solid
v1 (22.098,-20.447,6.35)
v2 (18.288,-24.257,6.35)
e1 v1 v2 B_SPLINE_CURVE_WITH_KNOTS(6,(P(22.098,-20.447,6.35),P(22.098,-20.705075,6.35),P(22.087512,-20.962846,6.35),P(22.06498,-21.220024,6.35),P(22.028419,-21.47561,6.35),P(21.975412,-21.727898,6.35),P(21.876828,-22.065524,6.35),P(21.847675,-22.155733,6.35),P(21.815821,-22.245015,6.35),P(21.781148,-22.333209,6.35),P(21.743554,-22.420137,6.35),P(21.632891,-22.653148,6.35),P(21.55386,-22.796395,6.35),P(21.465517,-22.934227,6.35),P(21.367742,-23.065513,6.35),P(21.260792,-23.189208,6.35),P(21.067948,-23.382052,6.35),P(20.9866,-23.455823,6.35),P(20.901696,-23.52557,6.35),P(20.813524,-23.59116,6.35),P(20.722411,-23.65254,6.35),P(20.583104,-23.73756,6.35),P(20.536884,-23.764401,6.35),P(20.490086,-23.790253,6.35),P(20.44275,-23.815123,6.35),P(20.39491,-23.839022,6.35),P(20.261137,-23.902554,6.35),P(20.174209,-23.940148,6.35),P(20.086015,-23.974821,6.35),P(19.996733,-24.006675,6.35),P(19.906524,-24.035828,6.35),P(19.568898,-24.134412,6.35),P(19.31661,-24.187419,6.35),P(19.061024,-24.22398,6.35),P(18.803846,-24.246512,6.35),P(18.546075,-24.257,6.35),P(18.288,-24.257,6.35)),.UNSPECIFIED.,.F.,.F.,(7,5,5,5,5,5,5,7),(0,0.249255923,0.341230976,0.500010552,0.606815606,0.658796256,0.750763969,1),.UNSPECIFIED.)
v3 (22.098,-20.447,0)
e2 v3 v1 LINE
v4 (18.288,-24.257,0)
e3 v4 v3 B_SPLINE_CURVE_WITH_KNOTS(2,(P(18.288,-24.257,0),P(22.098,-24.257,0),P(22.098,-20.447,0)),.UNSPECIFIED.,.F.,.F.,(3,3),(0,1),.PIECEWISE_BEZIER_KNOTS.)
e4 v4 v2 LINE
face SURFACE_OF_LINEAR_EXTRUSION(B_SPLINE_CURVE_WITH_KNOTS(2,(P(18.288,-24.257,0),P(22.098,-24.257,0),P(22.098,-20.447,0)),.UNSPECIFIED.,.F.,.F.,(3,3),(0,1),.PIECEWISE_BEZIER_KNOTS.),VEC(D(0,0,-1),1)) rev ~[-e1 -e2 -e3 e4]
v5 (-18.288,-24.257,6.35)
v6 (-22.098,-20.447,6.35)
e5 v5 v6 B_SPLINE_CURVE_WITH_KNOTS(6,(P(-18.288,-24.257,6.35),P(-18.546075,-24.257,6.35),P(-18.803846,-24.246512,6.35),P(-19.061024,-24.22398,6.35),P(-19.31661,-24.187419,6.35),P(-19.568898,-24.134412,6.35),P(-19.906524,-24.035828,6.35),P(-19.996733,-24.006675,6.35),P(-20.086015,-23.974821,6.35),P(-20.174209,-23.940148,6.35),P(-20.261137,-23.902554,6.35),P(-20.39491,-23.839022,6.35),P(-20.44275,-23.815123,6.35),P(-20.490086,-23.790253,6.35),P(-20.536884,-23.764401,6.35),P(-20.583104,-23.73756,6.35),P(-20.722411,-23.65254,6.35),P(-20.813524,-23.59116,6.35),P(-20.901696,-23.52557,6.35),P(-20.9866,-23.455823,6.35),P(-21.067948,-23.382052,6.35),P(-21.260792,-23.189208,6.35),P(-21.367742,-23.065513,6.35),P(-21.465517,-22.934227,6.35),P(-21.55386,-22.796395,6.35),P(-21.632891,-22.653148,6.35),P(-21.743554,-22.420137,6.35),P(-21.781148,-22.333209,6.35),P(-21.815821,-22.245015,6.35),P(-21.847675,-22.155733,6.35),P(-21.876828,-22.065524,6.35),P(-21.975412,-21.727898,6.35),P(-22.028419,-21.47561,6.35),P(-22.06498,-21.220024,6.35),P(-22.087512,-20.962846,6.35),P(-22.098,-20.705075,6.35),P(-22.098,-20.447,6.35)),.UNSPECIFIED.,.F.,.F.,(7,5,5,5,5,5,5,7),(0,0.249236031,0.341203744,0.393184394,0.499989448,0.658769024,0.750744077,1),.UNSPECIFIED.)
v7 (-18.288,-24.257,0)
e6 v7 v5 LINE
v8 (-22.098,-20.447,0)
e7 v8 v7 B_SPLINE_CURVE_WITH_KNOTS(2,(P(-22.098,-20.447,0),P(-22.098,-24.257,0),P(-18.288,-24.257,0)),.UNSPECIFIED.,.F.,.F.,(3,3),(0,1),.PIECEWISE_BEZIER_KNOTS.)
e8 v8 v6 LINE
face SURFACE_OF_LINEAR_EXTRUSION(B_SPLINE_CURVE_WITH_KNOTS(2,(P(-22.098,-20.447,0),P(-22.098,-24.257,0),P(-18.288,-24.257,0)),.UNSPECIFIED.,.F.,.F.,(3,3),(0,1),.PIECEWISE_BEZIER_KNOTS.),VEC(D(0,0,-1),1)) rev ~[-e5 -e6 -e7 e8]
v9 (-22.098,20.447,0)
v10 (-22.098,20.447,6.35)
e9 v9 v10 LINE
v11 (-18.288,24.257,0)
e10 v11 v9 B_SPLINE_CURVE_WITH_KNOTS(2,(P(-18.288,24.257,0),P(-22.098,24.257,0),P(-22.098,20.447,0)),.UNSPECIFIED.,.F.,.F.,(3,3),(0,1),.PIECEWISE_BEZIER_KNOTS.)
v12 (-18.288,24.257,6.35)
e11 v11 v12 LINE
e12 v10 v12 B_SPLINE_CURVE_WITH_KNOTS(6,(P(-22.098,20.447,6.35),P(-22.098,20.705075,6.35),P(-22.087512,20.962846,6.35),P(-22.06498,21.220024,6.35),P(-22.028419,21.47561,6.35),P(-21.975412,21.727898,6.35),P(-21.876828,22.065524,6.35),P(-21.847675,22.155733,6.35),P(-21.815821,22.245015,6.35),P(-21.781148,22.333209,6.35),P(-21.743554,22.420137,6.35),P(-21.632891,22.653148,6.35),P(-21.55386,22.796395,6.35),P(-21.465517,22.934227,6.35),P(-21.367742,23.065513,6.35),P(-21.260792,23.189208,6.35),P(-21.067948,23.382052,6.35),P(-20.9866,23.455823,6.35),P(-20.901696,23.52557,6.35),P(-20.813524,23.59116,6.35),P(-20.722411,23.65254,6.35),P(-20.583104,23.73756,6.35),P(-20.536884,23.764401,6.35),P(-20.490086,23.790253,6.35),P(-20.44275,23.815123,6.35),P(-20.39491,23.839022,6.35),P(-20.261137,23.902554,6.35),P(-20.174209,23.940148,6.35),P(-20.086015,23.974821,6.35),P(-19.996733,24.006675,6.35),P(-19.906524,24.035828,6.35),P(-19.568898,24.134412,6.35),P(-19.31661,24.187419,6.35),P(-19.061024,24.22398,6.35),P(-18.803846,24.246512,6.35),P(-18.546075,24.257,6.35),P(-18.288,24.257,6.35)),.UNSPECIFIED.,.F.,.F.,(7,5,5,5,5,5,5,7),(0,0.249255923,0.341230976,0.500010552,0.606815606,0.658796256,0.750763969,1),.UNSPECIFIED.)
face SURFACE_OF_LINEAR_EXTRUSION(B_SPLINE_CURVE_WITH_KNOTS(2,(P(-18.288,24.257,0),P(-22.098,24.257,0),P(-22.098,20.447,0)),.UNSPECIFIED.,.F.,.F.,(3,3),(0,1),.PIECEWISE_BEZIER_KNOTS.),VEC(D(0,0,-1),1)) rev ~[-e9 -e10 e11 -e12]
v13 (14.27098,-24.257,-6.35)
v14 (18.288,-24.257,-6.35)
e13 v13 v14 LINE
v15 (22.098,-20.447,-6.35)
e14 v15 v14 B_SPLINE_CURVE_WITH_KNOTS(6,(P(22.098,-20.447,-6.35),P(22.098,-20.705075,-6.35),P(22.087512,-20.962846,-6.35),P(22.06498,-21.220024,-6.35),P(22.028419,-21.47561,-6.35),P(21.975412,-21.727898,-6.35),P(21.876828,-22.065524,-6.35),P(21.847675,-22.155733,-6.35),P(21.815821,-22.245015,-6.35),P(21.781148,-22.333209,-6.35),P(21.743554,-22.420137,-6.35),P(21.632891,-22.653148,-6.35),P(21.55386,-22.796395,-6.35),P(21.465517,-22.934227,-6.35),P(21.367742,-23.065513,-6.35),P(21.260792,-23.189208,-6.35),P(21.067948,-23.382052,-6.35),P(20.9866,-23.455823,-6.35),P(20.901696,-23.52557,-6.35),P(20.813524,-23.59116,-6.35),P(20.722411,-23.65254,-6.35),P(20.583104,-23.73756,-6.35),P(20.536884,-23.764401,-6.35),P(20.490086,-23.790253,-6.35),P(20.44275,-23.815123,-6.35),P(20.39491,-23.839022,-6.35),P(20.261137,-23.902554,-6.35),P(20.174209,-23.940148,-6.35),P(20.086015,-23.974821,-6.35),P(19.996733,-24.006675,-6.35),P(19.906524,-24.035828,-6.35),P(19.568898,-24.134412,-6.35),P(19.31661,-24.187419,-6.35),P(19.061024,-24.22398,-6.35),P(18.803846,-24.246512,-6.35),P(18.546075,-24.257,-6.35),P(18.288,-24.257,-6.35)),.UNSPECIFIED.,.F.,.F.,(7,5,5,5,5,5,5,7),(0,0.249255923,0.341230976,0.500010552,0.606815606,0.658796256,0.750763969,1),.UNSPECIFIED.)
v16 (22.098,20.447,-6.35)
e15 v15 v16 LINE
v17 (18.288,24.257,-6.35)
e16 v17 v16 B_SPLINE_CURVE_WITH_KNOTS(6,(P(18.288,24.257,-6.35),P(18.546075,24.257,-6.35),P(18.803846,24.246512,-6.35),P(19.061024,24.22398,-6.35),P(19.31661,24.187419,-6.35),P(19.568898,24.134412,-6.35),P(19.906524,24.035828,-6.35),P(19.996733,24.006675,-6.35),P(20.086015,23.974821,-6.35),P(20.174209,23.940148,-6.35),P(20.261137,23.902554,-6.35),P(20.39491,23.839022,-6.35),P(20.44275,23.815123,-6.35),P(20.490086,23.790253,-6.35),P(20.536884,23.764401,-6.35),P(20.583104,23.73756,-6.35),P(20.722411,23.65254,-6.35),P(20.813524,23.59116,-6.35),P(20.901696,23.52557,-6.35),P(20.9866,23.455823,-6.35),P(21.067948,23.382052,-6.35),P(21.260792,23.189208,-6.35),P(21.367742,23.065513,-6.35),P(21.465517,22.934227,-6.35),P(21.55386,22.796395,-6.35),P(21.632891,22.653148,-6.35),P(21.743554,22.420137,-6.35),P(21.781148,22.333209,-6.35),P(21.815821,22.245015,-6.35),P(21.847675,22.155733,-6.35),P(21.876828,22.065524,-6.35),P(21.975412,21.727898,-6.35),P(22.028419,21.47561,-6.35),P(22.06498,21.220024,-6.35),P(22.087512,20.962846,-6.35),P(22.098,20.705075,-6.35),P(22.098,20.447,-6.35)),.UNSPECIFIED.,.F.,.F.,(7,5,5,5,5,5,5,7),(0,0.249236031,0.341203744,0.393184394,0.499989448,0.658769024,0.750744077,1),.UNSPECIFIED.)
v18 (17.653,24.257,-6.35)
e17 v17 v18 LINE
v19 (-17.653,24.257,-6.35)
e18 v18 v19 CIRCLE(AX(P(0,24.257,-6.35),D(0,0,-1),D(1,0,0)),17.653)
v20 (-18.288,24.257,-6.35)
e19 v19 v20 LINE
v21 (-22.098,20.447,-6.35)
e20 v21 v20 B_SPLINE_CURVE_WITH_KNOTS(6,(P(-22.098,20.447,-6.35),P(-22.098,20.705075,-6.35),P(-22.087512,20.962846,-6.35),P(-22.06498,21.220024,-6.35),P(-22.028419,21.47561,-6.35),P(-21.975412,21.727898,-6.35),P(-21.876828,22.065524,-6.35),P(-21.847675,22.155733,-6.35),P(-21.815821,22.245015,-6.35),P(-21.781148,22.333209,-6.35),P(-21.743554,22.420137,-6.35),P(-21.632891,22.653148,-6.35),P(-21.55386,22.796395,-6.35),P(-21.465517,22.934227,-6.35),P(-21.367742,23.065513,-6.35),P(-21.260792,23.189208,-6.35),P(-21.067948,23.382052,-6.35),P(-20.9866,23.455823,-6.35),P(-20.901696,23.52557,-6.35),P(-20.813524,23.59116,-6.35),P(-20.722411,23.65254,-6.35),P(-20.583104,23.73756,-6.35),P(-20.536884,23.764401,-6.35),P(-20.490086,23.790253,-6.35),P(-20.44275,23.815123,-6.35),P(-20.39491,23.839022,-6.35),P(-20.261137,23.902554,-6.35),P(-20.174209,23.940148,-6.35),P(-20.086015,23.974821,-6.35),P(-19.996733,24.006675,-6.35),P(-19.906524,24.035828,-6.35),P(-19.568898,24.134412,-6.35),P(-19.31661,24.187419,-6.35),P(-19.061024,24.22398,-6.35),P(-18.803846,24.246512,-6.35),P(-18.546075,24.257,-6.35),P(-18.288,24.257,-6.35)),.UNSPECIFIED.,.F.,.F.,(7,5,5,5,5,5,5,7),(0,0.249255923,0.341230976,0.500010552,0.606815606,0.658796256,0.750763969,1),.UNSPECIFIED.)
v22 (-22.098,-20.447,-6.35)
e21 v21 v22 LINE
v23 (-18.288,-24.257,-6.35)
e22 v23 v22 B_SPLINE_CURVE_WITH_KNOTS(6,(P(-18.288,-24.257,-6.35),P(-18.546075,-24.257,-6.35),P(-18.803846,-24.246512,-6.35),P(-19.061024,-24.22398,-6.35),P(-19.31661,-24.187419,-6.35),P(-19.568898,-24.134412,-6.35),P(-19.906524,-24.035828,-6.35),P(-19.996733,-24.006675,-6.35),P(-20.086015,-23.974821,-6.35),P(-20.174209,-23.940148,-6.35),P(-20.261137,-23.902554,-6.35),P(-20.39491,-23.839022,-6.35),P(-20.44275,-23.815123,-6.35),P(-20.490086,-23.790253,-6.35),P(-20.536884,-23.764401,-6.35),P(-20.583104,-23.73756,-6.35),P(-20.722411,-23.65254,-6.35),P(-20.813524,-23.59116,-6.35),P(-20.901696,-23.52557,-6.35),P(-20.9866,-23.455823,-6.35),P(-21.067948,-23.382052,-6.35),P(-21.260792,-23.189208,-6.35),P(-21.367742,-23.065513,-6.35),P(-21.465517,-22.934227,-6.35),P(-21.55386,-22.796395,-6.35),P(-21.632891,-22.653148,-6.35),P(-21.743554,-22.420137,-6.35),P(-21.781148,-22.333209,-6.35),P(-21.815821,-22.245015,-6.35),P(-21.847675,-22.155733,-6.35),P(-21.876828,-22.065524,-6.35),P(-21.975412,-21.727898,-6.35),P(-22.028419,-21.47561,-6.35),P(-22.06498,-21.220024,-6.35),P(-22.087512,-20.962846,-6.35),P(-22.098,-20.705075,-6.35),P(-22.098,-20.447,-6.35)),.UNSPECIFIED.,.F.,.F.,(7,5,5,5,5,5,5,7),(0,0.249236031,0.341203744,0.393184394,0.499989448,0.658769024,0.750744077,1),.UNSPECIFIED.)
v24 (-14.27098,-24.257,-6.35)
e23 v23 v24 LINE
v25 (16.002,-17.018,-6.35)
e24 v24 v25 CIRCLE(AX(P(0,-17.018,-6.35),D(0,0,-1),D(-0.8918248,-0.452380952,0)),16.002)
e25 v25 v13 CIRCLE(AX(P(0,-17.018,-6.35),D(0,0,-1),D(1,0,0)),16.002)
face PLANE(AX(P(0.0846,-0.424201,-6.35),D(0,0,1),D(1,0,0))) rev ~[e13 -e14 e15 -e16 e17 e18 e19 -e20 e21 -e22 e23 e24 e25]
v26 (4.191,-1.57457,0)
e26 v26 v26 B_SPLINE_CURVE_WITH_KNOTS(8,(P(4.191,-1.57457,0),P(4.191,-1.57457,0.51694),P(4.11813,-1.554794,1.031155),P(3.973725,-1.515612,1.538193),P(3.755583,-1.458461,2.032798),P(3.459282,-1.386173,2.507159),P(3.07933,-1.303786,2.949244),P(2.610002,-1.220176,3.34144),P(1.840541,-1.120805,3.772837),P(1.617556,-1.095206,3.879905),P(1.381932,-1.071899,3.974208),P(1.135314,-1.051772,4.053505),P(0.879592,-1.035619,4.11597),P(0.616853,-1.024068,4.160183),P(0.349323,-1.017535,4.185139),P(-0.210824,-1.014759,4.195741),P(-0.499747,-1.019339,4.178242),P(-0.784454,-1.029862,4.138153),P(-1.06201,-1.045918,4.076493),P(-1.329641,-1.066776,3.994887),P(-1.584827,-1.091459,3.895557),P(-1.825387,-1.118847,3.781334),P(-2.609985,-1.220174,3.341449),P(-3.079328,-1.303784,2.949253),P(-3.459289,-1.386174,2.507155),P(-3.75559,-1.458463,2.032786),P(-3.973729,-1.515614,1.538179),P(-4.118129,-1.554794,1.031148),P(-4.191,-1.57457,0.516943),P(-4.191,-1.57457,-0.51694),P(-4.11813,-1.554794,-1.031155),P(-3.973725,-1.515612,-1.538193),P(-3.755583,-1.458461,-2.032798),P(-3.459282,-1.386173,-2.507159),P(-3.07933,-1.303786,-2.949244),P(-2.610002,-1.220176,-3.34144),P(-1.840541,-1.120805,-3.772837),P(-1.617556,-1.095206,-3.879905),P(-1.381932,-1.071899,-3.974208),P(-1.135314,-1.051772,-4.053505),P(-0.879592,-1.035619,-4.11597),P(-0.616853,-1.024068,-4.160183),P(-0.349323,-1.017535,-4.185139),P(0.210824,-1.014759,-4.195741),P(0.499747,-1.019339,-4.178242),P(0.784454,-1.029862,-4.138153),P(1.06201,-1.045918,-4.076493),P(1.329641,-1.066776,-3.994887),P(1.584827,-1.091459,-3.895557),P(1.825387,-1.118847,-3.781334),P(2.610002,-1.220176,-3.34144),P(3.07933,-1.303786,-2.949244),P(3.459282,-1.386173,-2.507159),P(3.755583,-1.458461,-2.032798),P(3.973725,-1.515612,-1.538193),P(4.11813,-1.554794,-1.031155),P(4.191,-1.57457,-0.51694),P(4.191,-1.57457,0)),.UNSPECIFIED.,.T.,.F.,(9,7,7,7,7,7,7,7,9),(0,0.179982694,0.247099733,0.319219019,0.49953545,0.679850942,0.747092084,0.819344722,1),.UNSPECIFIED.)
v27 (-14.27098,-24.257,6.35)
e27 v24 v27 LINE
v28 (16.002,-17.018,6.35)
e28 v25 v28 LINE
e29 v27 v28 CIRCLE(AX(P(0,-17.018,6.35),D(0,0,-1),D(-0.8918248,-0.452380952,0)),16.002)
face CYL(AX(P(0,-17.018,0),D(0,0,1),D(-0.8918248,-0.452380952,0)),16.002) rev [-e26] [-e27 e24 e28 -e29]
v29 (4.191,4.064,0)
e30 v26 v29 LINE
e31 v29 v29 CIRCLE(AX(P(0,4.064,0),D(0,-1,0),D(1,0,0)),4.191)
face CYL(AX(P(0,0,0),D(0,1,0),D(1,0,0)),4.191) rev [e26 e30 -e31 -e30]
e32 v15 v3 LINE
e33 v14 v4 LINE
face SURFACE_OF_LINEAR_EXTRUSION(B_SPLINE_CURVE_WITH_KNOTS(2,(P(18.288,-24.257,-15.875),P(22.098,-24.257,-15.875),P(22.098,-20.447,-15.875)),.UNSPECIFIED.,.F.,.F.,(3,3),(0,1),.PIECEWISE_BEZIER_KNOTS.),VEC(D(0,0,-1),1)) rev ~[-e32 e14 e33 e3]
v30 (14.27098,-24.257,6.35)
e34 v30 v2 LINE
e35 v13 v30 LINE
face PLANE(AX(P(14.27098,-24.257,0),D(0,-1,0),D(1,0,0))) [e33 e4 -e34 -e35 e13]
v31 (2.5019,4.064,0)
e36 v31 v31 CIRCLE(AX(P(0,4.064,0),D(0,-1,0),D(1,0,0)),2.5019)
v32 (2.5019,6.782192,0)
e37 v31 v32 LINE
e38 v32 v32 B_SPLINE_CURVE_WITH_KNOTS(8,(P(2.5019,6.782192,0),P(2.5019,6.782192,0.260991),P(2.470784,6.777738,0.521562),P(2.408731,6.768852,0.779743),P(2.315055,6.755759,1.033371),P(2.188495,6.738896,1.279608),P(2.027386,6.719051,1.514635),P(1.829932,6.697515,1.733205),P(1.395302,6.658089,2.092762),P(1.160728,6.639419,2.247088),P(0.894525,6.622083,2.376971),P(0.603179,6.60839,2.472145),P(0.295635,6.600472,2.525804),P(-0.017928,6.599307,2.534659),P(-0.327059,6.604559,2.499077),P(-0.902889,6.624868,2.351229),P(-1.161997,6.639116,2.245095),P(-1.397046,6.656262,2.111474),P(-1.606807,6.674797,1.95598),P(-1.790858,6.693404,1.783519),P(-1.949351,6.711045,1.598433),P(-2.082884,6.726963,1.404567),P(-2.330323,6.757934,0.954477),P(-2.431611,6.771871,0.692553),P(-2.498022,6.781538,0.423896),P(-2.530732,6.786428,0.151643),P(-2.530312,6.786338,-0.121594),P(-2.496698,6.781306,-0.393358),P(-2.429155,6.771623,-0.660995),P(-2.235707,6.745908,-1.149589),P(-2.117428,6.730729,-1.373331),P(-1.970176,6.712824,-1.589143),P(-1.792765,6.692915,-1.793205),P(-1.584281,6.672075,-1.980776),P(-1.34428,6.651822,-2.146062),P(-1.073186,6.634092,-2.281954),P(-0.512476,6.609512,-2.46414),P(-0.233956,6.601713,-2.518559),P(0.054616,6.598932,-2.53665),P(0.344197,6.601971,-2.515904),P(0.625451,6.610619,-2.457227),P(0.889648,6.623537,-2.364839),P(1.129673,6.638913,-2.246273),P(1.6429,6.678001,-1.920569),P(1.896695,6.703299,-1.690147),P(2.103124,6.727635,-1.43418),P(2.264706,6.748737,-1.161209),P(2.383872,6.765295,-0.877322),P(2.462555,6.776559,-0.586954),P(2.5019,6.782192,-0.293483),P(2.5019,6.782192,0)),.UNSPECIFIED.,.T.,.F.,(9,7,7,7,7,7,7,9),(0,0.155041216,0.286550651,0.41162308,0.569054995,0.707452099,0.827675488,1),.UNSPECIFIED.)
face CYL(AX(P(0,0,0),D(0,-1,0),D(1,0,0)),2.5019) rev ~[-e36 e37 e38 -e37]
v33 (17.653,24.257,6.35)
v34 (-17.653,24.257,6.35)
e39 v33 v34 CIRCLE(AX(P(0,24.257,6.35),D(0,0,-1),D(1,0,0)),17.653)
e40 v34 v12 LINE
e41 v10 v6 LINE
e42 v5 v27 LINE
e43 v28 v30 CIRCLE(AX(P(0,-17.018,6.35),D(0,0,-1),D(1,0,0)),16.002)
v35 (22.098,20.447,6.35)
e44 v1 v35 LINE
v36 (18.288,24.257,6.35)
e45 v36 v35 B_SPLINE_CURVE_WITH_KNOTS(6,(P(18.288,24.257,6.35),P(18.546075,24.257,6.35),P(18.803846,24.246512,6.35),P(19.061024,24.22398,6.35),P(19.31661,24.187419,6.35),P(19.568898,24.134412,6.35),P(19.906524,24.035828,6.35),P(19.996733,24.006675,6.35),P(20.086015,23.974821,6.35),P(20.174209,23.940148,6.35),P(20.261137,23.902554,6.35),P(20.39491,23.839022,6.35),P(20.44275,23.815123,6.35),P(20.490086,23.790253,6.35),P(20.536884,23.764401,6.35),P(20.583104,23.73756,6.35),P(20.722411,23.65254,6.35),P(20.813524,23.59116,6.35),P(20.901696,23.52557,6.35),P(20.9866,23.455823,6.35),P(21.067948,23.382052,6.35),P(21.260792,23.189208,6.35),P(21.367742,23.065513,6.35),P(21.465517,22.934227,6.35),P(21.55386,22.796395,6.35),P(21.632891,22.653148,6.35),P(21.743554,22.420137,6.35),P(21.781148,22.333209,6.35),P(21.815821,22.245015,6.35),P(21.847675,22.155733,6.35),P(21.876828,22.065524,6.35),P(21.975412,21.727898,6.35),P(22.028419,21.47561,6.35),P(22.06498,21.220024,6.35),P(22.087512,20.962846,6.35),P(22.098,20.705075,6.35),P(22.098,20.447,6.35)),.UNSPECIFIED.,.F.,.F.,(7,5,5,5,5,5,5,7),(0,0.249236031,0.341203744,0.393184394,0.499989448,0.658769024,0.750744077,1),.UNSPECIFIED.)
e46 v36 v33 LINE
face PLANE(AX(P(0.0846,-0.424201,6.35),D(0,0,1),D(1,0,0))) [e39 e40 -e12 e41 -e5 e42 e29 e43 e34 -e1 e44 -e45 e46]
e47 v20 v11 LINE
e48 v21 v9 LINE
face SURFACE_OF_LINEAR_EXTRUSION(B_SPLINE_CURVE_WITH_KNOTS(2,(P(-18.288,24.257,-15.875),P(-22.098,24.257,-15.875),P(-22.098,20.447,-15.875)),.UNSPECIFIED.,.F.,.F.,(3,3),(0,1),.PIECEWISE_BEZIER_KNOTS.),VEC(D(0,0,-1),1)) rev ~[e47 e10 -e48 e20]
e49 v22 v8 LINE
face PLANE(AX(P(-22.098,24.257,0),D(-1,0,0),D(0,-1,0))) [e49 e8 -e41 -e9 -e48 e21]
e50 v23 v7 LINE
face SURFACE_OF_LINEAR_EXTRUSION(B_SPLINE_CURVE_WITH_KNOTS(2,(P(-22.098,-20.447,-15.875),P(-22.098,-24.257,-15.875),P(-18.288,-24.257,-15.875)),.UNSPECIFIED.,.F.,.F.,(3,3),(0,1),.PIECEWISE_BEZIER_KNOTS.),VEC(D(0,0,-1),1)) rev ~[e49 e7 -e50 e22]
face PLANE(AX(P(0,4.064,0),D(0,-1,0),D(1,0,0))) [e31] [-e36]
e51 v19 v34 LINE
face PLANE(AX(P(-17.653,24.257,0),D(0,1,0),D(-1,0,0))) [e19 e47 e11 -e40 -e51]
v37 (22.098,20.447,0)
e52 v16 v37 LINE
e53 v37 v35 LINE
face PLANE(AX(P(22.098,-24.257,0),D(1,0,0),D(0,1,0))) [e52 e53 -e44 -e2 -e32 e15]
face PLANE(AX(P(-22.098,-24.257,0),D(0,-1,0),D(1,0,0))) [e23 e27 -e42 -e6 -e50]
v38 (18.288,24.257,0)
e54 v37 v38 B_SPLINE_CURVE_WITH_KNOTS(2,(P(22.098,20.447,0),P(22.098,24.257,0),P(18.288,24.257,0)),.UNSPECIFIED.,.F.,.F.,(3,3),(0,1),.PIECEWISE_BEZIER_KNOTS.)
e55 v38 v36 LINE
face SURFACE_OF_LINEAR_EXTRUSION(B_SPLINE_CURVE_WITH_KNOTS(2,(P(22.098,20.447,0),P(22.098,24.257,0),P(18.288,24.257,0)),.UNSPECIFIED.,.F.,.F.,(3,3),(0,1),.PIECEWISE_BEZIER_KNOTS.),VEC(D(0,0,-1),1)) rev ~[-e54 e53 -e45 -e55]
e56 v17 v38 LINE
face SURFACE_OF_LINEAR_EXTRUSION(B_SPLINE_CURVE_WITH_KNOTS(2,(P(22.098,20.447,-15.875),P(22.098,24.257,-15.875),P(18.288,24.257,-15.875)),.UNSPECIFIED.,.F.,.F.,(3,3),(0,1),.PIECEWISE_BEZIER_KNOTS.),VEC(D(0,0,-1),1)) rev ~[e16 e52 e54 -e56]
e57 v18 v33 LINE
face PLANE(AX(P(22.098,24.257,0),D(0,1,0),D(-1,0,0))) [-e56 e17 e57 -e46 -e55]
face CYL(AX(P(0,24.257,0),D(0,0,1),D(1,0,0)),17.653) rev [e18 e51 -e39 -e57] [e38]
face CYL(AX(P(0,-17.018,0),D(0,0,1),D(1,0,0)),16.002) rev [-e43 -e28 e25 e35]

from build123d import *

# Parameters (mm, degrees)
F1_DEPTH      = 6.35
F1_DEPTH_BACK = 6.35
F2_R          = 4.191
F2_R_2        = 2.5019
F3_DEPTH      = 4.064
F3_DEPTH_BACK = 24.258
F4_DEPTH      = 24.258
F5_T1_DEPTH   = 15.875
F5_T3_DEPTH   = 15.875


# Not quite as in the source:
# - a fillet or chamfer that OpenCascade refuses, or shapes differently, is made with other operations: its cross-section is extruded or revolved along the edge and cut away or added
# - a feature names something its author has since deleted; it is built from what else it names


with BuildPart() as f1:
    # F0 (on Top) → F1 (new body, two sides)
    with BuildSketch(Plane.XY) as f1_sk:
        with BuildLine():
            Line((22.098, 24.257), (17.653, 24.257))
            ThreePointArc((17.653, 24.257), (0, 6.604), (-17.653, 24.257))
            Line((-17.653, 24.257), (-22.098, 24.257))
            Line((-22.098, 24.257), (-22.098, -24.257))
            Line((-22.098, -24.257), (-14.2709804499, -24.257))
            ThreePointArc((-14.2709804498, -24.257), (-3.7215436879, -1.454770368), (16.002, -17.018))
            ThreePointArc((16.002, -17.018), (15.563229632, -20.7395436879), (14.2709804499, -24.257))
            Line((14.2709804499, -24.257), (22.098, -24.257))
            Line((22.098, -24.257), (22.098, 24.257))
        make_face()
    extrude(amount=F1_DEPTH)
    extrude(f1_sk.sketch, amount=-F1_DEPTH_BACK)

    # F2 (on Front) → F3 (cut, two sides)
    with BuildSketch(Plane.XZ) as f3_sk:
        Circle(F2_R)
        Circle(F2_R_2, mode=Mode.SUBTRACT)
        Circle(F2_R_2)
    extrude(amount=-F3_DEPTH, mode=Mode.SUBTRACT)
    extrude(f3_sk.sketch, amount=F3_DEPTH_BACK, mode=Mode.SUBTRACT)

    # F2 (on Front) → F4 (cut, through all)
    with BuildSketch(Plane.XZ):
        Circle(F2_R_2)
    extrude(amount=-F4_DEPTH, mode=Mode.SUBTRACT)

    # F5: fillet of radius 3.81 on 8 edges, made by hand

    # F5_s2 → F5_t1 (cut)
    with BuildSketch(Plane.XY):
        with BuildLine():
            add(Edge.make_bspline(
                [(-22.098, -20.447), (-22.098, -24.257), (-18.288, -24.257)],
                knots=[0, 0, 0, 1, 1, 1], degree=2, weights=[1, 1, 1]))
            Line((-18.288, -24.257), (-22.098, -24.257))
            Line((-22.098, -24.257), (-22.098, -20.447))
        make_face()
        with BuildLine():
            add(Edge.make_bspline(
                [(18.288, -24.257), (22.098, -24.257), (22.098, -20.447)],
                knots=[0, 0, 0, 1, 1, 1], degree=2, weights=[1, 1, 1]))
            Line((22.098, -20.447), (22.098, -24.257))
            Line((22.098, -24.257), (18.288, -24.257))
        make_face()
        with BuildLine():
            add(Edge.make_bspline(
                [(-18.288, 24.257), (-22.098, 24.257), (-22.098, 20.447)],
                knots=[0, 0, 0, 1, 1, 1], degree=2, weights=[1, 1, 1]))
            Line((-22.098, 20.447), (-22.098, 24.257))
            Line((-22.098, 24.257), (-18.288, 24.257))
        make_face()
        with BuildLine():
            add(Edge.make_bspline(
                [(22.098, 20.447), (22.098, 24.257), (18.288, 24.257)],
                knots=[0, 0, 0, 1, 1, 1], degree=2, weights=[1, 1, 1]))
            Line((18.288, 24.257), (22.098, 24.257))
            Line((22.098, 24.257), (22.098, 20.447))
        make_face()
    extrude(amount=F5_T1_DEPTH, mode=Mode.SUBTRACT)

    # F5_s4 → F5_t3 (cut)
    with BuildSketch(Plane.XY.offset(-15.875)):
        with BuildLine():
            add(Edge.make_bspline(
                [(-22.098, -20.447), (-22.098, -24.257), (-18.288, -24.257)],
                knots=[0, 0, 0, 1, 1, 1], degree=2, weights=[1, 1, 1]))
            Line((-18.288, -24.257), (-22.098, -24.257))
            Line((-22.098, -24.257), (-22.098, -20.447))
        make_face()
        with BuildLine():
            add(Edge.make_bspline(
                [(18.288, -24.257), (22.098, -24.257), (22.098, -20.447)],
                knots=[0, 0, 0, 1, 1, 1], degree=2, weights=[1, 1, 1]))
            Line((22.098, -20.447), (22.098, -24.257))
            Line((22.098, -24.257), (18.288, -24.257))
        make_face()
        with BuildLine():
            add(Edge.make_bspline(
                [(-18.288, 24.257), (-22.098, 24.257), (-22.098, 20.447)],
                knots=[0, 0, 0, 1, 1, 1], degree=2, weights=[1, 1, 1]))
            Line((-22.098, 20.447), (-22.098, 24.257))
            Line((-22.098, 24.257), (-18.288, 24.257))
        make_face()
        with BuildLine():
            add(Edge.make_bspline(
                [(22.098, 20.447), (22.098, 24.257), (18.288, 24.257)],
                knots=[0, 0, 0, 1, 1, 1], degree=2, weights=[1, 1, 1]))
            Line((18.288, 24.257), (22.098, 24.257))
            Line((22.098, 24.257), (22.098, 20.447))
        make_face()
    extrude(amount=F5_T3_DEPTH, mode=Mode.SUBTRACT)


solid = f1.part
